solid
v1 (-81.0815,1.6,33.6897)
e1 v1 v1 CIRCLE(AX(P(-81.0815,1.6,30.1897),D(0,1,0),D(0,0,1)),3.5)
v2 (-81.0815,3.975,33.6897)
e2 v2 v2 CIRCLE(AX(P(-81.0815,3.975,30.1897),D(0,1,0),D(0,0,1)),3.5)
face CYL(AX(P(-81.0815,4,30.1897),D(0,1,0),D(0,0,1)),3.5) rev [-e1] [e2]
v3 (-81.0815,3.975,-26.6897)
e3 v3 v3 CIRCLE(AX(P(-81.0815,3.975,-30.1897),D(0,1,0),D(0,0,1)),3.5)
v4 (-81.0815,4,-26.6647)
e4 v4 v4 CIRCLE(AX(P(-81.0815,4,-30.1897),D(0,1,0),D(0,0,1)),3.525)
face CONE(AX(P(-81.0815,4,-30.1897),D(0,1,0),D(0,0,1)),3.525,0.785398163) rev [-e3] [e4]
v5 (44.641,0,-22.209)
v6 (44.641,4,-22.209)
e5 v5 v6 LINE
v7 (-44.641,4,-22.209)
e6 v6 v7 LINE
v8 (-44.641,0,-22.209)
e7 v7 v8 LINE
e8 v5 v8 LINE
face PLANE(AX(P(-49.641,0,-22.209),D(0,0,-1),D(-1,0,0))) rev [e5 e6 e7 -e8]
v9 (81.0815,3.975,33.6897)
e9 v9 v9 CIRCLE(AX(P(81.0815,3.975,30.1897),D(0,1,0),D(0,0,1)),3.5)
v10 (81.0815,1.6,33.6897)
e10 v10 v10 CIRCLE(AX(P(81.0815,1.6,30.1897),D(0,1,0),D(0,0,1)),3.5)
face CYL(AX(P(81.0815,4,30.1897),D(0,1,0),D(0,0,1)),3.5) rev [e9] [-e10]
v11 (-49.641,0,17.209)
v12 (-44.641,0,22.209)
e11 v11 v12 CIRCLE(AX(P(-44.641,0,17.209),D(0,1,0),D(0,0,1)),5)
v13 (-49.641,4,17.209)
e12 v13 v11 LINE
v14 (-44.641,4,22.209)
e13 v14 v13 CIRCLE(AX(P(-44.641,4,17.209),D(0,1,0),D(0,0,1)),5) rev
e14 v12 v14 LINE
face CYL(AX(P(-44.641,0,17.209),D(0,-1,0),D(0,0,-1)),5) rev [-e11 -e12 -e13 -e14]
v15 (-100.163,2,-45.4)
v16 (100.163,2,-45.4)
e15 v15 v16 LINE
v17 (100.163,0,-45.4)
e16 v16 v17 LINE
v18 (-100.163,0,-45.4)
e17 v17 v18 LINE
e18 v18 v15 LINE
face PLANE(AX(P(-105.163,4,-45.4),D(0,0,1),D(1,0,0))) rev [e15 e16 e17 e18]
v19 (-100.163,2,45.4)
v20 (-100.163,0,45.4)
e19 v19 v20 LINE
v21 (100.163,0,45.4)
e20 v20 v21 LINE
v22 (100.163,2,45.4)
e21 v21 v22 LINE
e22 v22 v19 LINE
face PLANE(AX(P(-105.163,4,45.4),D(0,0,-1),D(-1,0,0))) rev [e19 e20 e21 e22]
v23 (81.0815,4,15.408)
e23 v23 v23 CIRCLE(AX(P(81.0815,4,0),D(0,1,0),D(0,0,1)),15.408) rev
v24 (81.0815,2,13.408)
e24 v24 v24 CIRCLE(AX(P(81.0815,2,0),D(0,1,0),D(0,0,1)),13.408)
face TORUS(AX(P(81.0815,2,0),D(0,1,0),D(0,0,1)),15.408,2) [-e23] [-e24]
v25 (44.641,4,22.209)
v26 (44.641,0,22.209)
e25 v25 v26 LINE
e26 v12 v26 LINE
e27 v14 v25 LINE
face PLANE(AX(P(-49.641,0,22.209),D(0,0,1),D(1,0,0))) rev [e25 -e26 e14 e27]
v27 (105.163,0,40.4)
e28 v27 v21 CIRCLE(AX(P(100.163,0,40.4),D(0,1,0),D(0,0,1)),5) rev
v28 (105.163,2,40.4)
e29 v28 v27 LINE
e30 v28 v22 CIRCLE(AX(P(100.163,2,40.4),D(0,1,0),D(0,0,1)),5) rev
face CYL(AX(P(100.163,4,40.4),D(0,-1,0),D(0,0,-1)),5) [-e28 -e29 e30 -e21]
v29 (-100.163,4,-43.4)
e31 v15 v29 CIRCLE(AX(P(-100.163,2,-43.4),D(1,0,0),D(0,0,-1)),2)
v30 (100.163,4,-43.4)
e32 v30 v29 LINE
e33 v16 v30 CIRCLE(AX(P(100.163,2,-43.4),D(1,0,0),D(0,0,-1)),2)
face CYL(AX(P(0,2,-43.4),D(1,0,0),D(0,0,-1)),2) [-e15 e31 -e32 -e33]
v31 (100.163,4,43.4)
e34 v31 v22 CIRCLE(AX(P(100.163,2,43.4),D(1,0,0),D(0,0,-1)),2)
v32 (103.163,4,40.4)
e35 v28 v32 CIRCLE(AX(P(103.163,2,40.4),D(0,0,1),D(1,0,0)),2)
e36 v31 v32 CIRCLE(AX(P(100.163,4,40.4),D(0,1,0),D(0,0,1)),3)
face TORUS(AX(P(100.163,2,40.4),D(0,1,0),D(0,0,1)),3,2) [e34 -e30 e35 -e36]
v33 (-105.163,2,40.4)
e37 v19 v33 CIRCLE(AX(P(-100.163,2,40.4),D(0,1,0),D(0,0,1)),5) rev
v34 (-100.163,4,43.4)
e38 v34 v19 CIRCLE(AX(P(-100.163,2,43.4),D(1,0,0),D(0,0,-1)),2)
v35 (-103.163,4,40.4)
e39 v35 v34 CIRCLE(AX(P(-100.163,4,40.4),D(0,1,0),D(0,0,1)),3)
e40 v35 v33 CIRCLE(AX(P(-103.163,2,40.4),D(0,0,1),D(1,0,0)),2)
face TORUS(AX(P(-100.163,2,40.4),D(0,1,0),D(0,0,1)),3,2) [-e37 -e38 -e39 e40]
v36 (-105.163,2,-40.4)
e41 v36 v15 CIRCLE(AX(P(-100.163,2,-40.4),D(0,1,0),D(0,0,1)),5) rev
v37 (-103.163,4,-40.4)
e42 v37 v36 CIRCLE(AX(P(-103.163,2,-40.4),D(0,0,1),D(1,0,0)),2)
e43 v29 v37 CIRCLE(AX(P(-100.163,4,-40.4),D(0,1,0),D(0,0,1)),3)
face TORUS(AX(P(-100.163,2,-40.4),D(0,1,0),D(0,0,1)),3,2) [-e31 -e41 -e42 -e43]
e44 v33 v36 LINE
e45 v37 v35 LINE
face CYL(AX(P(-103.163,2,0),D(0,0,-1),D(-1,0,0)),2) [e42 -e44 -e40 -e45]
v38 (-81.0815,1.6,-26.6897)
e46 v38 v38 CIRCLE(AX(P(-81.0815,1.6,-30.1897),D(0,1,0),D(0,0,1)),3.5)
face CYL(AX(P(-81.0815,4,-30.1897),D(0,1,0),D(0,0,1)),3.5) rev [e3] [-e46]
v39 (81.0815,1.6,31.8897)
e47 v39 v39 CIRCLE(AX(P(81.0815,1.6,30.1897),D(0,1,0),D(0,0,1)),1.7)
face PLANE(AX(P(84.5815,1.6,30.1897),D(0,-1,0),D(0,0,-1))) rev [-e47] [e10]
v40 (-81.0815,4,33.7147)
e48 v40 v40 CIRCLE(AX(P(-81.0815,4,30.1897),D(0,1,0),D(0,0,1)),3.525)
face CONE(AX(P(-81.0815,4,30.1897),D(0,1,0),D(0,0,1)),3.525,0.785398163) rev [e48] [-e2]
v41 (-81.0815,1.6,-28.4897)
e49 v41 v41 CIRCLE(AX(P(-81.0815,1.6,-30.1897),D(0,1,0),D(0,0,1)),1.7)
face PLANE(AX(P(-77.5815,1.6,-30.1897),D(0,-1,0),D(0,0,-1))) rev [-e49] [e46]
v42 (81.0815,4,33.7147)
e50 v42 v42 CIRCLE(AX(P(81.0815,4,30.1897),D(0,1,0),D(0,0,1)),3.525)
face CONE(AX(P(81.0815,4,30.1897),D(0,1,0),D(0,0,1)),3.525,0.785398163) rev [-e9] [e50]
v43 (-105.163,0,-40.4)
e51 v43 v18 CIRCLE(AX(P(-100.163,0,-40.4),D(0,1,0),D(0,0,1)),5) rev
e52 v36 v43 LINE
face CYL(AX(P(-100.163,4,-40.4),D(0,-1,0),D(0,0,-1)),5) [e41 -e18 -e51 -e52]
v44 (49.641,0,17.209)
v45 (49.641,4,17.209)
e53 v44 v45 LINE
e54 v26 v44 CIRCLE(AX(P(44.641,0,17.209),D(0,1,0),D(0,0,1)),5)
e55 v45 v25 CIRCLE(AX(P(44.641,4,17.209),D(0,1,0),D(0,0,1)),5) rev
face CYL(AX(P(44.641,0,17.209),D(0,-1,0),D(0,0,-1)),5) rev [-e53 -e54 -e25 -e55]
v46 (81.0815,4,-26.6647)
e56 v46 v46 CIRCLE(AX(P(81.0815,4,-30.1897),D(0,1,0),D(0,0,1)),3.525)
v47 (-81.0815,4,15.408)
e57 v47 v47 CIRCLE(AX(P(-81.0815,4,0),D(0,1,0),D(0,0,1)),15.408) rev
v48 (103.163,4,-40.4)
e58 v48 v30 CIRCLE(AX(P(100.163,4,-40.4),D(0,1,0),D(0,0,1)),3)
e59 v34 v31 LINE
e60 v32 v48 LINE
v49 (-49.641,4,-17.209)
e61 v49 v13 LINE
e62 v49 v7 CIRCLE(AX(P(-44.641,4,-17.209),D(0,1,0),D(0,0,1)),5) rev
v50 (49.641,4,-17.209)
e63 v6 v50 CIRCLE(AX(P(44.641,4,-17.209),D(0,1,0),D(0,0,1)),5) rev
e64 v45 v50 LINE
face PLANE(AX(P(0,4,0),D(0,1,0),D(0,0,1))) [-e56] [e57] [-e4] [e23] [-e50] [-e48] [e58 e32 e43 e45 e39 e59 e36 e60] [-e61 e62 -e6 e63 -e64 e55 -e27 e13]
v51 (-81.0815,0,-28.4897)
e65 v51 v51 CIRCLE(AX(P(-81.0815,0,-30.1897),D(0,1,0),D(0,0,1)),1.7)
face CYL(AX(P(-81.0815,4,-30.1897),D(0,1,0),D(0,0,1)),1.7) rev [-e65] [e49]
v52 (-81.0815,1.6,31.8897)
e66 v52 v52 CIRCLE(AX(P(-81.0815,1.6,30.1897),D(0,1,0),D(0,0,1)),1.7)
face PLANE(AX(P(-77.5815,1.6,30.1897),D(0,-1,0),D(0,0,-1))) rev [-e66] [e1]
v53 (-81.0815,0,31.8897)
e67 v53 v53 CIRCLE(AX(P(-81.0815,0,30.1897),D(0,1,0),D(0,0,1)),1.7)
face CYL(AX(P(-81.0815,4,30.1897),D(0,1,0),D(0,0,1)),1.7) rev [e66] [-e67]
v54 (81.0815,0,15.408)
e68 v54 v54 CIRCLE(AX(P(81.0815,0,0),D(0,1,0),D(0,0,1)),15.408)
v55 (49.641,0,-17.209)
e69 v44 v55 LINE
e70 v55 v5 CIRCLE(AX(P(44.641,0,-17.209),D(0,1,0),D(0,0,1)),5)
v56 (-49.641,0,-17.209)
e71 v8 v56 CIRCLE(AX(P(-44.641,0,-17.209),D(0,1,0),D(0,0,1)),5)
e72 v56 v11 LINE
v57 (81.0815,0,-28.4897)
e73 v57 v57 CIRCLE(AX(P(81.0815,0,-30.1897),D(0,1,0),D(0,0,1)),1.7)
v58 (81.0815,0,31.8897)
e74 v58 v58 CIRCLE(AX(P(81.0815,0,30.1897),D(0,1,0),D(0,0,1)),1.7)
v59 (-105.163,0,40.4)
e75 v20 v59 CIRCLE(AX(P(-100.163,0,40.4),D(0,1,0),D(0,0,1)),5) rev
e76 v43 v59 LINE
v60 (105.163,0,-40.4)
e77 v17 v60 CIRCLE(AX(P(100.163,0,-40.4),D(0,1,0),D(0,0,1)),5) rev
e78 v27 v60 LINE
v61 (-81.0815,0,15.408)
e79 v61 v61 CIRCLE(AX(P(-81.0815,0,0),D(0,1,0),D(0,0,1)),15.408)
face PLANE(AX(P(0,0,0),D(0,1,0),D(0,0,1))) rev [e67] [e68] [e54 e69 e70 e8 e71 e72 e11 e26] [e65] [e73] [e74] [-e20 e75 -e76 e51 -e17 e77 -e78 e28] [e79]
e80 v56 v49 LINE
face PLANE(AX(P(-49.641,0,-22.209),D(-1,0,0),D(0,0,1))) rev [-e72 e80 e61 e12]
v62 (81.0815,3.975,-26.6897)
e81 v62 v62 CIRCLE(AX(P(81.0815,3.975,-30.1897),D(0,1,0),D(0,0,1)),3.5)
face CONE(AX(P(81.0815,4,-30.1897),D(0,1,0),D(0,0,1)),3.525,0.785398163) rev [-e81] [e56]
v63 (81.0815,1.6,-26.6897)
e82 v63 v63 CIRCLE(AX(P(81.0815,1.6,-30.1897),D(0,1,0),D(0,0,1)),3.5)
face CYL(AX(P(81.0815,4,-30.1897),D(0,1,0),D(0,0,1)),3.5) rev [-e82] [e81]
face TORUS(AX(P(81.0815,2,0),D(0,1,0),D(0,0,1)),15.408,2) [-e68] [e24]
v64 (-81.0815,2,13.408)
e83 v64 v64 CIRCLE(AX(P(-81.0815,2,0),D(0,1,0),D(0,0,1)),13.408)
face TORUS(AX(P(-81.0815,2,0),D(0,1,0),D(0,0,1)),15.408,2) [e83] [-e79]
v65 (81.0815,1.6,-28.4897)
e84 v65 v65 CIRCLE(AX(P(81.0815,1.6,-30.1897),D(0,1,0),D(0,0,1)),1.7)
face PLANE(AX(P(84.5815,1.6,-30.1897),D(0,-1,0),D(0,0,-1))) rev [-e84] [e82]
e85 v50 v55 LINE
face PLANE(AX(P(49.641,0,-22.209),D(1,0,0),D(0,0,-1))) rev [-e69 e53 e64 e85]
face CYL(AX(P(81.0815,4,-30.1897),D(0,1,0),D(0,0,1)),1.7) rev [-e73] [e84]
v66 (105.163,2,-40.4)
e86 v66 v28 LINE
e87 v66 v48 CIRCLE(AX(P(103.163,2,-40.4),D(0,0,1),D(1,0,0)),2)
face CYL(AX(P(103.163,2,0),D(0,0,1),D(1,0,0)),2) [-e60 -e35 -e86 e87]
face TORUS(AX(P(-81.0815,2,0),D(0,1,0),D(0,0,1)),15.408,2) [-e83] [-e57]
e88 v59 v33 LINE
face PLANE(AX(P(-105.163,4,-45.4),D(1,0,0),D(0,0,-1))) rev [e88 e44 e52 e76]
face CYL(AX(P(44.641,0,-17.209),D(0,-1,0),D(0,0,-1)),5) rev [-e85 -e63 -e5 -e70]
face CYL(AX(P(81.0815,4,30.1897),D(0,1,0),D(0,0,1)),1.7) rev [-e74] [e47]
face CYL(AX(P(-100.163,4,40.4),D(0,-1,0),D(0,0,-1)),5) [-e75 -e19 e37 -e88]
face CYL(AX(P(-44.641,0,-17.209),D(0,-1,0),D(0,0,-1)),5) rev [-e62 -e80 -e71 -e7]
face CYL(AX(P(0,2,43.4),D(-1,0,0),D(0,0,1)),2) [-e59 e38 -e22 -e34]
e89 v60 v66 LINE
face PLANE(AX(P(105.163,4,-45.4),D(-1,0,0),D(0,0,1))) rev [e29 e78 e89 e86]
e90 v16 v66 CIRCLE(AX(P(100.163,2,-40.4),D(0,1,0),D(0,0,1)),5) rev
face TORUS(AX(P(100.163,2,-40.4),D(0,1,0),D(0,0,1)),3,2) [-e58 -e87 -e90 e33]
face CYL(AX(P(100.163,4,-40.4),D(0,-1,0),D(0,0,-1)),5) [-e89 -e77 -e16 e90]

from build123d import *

# Parameters (mm, degrees)
SKETCH1_W                                     = 210.326
SKETCH1_H                                     = 90.8
BOSS_EXTRUDE1_DEPTH                           = 4
CBORE_FOR_M3_PAN_HEAD_MACHINE_SCREW1_AT_COUNT = 2
CBORE_FOR_M3_PAN_HEAD_MACHINE_SCREW1_AT_PITCH = 162.163
CBORE_FOR_M3_PAN_HEAD_MACHINE_SCREW1_2_COUNT  = 2
CBORE_FOR_M3_PAN_HEAD_MACHINE_SCREW1_2_PITCH  = 173.039043321
CBORE_FOR_M3_PAN_HEAD_MACHINE_SCREW1_3_COUNT  = 2
CBORE_FOR_M3_PAN_HEAD_MACHINE_SCREW1_3_PITCH  = 60.3794
SKETCH2_R                                     = 13.408
SKETCH2_W                                     = 99.282
SKETCH2_H                                     = 44.418
CUT_EXTRUDE1_DEPTH                            = 4
FILLET1_R                                     = 5
FILLET2_R                                     = 2


with BuildPart() as part:
    # Sketch1 → Boss-Extrude1 (new body)
    with BuildSketch(Plane(origin=(0, 0, 0), x_dir=(1, 0, 0), z_dir=(0, 1, 0))):
        Rectangle(SKETCH1_W, SKETCH1_H)
    extrude(amount=BOSS_EXTRUDE1_DEPTH)

    # Sketch5 → CBORE for M3 Pan Head Machine Screw1 (revolve, cut)
    with BuildSketch(Plane(origin=(-81.0815, 4, -30.1897), x_dir=(0, 0, 1), z_dir=(1, 0, 0))):
        Polygon((0, 0), (0, 4), (1.7, 4), (1.7, 2.4), (3.5, 2.4), (3.5, 0.025), (3.525, 0), align=None)
    cbore_for_m3_pan_head_machine_screw1 = revolve(axis=Axis((-81.0815, 10.35, -30.1897), (0, -1, 0)), mode=Mode.SUBTRACT)

    # CBORE for M3 Pan Head Machine Screw1 at: CBORE for M3 Pan Head Machine Screw1 ×2
    with Locations(*[(i * CBORE_FOR_M3_PAN_HEAD_MACHINE_SCREW1_AT_PITCH, 0, 0) for i in range(1, CBORE_FOR_M3_PAN_HEAD_MACHINE_SCREW1_AT_COUNT)]):
        add(cbore_for_m3_pan_head_machine_screw1, mode=Mode.SUBTRACT)

    # CBORE for M3 Pan Head Machine Screw1 2: CBORE for M3 Pan Head Machine Screw1 ×2
    with Locations(*[Vector(0.9371468825068064, 0, 0.3489351237805877) * (i * CBORE_FOR_M3_PAN_HEAD_MACHINE_SCREW1_2_PITCH) for i in range(1, CBORE_FOR_M3_PAN_HEAD_MACHINE_SCREW1_2_COUNT)]):
        add(cbore_for_m3_pan_head_machine_screw1, mode=Mode.SUBTRACT)

    # CBORE for M3 Pan Head Machine Screw1 3: CBORE for M3 Pan Head Machine Screw1 ×2
    with Locations(*[(0, 0, i * CBORE_FOR_M3_PAN_HEAD_MACHINE_SCREW1_3_PITCH) for i in range(1, CBORE_FOR_M3_PAN_HEAD_MACHINE_SCREW1_3_COUNT)]):
        add(cbore_for_m3_pan_head_machine_screw1, mode=Mode.SUBTRACT)

    # Sketch2 → Cut-Extrude1 (cut)
    with BuildSketch(Plane(origin=(0, 4, 0), x_dir=(1, 0, 0), z_dir=(0, 1, 0))):
        with Locations(Location((-81.0815, 0, 0), (0, 0, 270))):
            Circle(SKETCH2_R)
        with Locations(Location((81.0815, 0, 0), (0, 0, 270))):
            Circle(SKETCH2_R)
        Rectangle(SKETCH2_W, SKETCH2_H)
    extrude(amount=-CUT_EXTRUDE1_DEPTH, mode=Mode.SUBTRACT)

    # Fillet1
    fillet1_edges = [part.edges().sort_by_distance(p)[0] for p in [
        (49.641, 2, -22.209),
        (49.641, 2, 22.209),
        (-49.641, 2, 22.209),
        (-49.641, 2, -22.209),
        (105.163, 2, 45.4),
        (-105.163, 2, 45.4),
        (-105.163, 2, -45.4),
        (105.163, 2, -45.4),
    ]]
    fillet(fillet1_edges, radius=FILLET1_R)

    # Fillet2
    fillet2_edges = [part.edges().sort_by_distance(p)[0] for p in [
        (81.0815, 0, -13.408),
        (81.0815, 4, -13.408),
        (-81.0815, 0, -13.408),
        (-81.0815, 4, -13.408),
        (0, 4, -45.4),
        (105.163, 4, 0),
        (-105.163, 4, 0),
        (0, 4, 45.4),
        (-103.698533906, 4, -43.935533906),
        (-103.698533906, 4, 43.935533906),
        (103.698533906, 4, 43.935533906),
        (103.698533906, 4, -43.935533906),
    ]]
    fillet(fillet2_edges, radius=FILLET2_R - 0.0001)  # a hair under: the kernel refuses the full size


solid = part.part
